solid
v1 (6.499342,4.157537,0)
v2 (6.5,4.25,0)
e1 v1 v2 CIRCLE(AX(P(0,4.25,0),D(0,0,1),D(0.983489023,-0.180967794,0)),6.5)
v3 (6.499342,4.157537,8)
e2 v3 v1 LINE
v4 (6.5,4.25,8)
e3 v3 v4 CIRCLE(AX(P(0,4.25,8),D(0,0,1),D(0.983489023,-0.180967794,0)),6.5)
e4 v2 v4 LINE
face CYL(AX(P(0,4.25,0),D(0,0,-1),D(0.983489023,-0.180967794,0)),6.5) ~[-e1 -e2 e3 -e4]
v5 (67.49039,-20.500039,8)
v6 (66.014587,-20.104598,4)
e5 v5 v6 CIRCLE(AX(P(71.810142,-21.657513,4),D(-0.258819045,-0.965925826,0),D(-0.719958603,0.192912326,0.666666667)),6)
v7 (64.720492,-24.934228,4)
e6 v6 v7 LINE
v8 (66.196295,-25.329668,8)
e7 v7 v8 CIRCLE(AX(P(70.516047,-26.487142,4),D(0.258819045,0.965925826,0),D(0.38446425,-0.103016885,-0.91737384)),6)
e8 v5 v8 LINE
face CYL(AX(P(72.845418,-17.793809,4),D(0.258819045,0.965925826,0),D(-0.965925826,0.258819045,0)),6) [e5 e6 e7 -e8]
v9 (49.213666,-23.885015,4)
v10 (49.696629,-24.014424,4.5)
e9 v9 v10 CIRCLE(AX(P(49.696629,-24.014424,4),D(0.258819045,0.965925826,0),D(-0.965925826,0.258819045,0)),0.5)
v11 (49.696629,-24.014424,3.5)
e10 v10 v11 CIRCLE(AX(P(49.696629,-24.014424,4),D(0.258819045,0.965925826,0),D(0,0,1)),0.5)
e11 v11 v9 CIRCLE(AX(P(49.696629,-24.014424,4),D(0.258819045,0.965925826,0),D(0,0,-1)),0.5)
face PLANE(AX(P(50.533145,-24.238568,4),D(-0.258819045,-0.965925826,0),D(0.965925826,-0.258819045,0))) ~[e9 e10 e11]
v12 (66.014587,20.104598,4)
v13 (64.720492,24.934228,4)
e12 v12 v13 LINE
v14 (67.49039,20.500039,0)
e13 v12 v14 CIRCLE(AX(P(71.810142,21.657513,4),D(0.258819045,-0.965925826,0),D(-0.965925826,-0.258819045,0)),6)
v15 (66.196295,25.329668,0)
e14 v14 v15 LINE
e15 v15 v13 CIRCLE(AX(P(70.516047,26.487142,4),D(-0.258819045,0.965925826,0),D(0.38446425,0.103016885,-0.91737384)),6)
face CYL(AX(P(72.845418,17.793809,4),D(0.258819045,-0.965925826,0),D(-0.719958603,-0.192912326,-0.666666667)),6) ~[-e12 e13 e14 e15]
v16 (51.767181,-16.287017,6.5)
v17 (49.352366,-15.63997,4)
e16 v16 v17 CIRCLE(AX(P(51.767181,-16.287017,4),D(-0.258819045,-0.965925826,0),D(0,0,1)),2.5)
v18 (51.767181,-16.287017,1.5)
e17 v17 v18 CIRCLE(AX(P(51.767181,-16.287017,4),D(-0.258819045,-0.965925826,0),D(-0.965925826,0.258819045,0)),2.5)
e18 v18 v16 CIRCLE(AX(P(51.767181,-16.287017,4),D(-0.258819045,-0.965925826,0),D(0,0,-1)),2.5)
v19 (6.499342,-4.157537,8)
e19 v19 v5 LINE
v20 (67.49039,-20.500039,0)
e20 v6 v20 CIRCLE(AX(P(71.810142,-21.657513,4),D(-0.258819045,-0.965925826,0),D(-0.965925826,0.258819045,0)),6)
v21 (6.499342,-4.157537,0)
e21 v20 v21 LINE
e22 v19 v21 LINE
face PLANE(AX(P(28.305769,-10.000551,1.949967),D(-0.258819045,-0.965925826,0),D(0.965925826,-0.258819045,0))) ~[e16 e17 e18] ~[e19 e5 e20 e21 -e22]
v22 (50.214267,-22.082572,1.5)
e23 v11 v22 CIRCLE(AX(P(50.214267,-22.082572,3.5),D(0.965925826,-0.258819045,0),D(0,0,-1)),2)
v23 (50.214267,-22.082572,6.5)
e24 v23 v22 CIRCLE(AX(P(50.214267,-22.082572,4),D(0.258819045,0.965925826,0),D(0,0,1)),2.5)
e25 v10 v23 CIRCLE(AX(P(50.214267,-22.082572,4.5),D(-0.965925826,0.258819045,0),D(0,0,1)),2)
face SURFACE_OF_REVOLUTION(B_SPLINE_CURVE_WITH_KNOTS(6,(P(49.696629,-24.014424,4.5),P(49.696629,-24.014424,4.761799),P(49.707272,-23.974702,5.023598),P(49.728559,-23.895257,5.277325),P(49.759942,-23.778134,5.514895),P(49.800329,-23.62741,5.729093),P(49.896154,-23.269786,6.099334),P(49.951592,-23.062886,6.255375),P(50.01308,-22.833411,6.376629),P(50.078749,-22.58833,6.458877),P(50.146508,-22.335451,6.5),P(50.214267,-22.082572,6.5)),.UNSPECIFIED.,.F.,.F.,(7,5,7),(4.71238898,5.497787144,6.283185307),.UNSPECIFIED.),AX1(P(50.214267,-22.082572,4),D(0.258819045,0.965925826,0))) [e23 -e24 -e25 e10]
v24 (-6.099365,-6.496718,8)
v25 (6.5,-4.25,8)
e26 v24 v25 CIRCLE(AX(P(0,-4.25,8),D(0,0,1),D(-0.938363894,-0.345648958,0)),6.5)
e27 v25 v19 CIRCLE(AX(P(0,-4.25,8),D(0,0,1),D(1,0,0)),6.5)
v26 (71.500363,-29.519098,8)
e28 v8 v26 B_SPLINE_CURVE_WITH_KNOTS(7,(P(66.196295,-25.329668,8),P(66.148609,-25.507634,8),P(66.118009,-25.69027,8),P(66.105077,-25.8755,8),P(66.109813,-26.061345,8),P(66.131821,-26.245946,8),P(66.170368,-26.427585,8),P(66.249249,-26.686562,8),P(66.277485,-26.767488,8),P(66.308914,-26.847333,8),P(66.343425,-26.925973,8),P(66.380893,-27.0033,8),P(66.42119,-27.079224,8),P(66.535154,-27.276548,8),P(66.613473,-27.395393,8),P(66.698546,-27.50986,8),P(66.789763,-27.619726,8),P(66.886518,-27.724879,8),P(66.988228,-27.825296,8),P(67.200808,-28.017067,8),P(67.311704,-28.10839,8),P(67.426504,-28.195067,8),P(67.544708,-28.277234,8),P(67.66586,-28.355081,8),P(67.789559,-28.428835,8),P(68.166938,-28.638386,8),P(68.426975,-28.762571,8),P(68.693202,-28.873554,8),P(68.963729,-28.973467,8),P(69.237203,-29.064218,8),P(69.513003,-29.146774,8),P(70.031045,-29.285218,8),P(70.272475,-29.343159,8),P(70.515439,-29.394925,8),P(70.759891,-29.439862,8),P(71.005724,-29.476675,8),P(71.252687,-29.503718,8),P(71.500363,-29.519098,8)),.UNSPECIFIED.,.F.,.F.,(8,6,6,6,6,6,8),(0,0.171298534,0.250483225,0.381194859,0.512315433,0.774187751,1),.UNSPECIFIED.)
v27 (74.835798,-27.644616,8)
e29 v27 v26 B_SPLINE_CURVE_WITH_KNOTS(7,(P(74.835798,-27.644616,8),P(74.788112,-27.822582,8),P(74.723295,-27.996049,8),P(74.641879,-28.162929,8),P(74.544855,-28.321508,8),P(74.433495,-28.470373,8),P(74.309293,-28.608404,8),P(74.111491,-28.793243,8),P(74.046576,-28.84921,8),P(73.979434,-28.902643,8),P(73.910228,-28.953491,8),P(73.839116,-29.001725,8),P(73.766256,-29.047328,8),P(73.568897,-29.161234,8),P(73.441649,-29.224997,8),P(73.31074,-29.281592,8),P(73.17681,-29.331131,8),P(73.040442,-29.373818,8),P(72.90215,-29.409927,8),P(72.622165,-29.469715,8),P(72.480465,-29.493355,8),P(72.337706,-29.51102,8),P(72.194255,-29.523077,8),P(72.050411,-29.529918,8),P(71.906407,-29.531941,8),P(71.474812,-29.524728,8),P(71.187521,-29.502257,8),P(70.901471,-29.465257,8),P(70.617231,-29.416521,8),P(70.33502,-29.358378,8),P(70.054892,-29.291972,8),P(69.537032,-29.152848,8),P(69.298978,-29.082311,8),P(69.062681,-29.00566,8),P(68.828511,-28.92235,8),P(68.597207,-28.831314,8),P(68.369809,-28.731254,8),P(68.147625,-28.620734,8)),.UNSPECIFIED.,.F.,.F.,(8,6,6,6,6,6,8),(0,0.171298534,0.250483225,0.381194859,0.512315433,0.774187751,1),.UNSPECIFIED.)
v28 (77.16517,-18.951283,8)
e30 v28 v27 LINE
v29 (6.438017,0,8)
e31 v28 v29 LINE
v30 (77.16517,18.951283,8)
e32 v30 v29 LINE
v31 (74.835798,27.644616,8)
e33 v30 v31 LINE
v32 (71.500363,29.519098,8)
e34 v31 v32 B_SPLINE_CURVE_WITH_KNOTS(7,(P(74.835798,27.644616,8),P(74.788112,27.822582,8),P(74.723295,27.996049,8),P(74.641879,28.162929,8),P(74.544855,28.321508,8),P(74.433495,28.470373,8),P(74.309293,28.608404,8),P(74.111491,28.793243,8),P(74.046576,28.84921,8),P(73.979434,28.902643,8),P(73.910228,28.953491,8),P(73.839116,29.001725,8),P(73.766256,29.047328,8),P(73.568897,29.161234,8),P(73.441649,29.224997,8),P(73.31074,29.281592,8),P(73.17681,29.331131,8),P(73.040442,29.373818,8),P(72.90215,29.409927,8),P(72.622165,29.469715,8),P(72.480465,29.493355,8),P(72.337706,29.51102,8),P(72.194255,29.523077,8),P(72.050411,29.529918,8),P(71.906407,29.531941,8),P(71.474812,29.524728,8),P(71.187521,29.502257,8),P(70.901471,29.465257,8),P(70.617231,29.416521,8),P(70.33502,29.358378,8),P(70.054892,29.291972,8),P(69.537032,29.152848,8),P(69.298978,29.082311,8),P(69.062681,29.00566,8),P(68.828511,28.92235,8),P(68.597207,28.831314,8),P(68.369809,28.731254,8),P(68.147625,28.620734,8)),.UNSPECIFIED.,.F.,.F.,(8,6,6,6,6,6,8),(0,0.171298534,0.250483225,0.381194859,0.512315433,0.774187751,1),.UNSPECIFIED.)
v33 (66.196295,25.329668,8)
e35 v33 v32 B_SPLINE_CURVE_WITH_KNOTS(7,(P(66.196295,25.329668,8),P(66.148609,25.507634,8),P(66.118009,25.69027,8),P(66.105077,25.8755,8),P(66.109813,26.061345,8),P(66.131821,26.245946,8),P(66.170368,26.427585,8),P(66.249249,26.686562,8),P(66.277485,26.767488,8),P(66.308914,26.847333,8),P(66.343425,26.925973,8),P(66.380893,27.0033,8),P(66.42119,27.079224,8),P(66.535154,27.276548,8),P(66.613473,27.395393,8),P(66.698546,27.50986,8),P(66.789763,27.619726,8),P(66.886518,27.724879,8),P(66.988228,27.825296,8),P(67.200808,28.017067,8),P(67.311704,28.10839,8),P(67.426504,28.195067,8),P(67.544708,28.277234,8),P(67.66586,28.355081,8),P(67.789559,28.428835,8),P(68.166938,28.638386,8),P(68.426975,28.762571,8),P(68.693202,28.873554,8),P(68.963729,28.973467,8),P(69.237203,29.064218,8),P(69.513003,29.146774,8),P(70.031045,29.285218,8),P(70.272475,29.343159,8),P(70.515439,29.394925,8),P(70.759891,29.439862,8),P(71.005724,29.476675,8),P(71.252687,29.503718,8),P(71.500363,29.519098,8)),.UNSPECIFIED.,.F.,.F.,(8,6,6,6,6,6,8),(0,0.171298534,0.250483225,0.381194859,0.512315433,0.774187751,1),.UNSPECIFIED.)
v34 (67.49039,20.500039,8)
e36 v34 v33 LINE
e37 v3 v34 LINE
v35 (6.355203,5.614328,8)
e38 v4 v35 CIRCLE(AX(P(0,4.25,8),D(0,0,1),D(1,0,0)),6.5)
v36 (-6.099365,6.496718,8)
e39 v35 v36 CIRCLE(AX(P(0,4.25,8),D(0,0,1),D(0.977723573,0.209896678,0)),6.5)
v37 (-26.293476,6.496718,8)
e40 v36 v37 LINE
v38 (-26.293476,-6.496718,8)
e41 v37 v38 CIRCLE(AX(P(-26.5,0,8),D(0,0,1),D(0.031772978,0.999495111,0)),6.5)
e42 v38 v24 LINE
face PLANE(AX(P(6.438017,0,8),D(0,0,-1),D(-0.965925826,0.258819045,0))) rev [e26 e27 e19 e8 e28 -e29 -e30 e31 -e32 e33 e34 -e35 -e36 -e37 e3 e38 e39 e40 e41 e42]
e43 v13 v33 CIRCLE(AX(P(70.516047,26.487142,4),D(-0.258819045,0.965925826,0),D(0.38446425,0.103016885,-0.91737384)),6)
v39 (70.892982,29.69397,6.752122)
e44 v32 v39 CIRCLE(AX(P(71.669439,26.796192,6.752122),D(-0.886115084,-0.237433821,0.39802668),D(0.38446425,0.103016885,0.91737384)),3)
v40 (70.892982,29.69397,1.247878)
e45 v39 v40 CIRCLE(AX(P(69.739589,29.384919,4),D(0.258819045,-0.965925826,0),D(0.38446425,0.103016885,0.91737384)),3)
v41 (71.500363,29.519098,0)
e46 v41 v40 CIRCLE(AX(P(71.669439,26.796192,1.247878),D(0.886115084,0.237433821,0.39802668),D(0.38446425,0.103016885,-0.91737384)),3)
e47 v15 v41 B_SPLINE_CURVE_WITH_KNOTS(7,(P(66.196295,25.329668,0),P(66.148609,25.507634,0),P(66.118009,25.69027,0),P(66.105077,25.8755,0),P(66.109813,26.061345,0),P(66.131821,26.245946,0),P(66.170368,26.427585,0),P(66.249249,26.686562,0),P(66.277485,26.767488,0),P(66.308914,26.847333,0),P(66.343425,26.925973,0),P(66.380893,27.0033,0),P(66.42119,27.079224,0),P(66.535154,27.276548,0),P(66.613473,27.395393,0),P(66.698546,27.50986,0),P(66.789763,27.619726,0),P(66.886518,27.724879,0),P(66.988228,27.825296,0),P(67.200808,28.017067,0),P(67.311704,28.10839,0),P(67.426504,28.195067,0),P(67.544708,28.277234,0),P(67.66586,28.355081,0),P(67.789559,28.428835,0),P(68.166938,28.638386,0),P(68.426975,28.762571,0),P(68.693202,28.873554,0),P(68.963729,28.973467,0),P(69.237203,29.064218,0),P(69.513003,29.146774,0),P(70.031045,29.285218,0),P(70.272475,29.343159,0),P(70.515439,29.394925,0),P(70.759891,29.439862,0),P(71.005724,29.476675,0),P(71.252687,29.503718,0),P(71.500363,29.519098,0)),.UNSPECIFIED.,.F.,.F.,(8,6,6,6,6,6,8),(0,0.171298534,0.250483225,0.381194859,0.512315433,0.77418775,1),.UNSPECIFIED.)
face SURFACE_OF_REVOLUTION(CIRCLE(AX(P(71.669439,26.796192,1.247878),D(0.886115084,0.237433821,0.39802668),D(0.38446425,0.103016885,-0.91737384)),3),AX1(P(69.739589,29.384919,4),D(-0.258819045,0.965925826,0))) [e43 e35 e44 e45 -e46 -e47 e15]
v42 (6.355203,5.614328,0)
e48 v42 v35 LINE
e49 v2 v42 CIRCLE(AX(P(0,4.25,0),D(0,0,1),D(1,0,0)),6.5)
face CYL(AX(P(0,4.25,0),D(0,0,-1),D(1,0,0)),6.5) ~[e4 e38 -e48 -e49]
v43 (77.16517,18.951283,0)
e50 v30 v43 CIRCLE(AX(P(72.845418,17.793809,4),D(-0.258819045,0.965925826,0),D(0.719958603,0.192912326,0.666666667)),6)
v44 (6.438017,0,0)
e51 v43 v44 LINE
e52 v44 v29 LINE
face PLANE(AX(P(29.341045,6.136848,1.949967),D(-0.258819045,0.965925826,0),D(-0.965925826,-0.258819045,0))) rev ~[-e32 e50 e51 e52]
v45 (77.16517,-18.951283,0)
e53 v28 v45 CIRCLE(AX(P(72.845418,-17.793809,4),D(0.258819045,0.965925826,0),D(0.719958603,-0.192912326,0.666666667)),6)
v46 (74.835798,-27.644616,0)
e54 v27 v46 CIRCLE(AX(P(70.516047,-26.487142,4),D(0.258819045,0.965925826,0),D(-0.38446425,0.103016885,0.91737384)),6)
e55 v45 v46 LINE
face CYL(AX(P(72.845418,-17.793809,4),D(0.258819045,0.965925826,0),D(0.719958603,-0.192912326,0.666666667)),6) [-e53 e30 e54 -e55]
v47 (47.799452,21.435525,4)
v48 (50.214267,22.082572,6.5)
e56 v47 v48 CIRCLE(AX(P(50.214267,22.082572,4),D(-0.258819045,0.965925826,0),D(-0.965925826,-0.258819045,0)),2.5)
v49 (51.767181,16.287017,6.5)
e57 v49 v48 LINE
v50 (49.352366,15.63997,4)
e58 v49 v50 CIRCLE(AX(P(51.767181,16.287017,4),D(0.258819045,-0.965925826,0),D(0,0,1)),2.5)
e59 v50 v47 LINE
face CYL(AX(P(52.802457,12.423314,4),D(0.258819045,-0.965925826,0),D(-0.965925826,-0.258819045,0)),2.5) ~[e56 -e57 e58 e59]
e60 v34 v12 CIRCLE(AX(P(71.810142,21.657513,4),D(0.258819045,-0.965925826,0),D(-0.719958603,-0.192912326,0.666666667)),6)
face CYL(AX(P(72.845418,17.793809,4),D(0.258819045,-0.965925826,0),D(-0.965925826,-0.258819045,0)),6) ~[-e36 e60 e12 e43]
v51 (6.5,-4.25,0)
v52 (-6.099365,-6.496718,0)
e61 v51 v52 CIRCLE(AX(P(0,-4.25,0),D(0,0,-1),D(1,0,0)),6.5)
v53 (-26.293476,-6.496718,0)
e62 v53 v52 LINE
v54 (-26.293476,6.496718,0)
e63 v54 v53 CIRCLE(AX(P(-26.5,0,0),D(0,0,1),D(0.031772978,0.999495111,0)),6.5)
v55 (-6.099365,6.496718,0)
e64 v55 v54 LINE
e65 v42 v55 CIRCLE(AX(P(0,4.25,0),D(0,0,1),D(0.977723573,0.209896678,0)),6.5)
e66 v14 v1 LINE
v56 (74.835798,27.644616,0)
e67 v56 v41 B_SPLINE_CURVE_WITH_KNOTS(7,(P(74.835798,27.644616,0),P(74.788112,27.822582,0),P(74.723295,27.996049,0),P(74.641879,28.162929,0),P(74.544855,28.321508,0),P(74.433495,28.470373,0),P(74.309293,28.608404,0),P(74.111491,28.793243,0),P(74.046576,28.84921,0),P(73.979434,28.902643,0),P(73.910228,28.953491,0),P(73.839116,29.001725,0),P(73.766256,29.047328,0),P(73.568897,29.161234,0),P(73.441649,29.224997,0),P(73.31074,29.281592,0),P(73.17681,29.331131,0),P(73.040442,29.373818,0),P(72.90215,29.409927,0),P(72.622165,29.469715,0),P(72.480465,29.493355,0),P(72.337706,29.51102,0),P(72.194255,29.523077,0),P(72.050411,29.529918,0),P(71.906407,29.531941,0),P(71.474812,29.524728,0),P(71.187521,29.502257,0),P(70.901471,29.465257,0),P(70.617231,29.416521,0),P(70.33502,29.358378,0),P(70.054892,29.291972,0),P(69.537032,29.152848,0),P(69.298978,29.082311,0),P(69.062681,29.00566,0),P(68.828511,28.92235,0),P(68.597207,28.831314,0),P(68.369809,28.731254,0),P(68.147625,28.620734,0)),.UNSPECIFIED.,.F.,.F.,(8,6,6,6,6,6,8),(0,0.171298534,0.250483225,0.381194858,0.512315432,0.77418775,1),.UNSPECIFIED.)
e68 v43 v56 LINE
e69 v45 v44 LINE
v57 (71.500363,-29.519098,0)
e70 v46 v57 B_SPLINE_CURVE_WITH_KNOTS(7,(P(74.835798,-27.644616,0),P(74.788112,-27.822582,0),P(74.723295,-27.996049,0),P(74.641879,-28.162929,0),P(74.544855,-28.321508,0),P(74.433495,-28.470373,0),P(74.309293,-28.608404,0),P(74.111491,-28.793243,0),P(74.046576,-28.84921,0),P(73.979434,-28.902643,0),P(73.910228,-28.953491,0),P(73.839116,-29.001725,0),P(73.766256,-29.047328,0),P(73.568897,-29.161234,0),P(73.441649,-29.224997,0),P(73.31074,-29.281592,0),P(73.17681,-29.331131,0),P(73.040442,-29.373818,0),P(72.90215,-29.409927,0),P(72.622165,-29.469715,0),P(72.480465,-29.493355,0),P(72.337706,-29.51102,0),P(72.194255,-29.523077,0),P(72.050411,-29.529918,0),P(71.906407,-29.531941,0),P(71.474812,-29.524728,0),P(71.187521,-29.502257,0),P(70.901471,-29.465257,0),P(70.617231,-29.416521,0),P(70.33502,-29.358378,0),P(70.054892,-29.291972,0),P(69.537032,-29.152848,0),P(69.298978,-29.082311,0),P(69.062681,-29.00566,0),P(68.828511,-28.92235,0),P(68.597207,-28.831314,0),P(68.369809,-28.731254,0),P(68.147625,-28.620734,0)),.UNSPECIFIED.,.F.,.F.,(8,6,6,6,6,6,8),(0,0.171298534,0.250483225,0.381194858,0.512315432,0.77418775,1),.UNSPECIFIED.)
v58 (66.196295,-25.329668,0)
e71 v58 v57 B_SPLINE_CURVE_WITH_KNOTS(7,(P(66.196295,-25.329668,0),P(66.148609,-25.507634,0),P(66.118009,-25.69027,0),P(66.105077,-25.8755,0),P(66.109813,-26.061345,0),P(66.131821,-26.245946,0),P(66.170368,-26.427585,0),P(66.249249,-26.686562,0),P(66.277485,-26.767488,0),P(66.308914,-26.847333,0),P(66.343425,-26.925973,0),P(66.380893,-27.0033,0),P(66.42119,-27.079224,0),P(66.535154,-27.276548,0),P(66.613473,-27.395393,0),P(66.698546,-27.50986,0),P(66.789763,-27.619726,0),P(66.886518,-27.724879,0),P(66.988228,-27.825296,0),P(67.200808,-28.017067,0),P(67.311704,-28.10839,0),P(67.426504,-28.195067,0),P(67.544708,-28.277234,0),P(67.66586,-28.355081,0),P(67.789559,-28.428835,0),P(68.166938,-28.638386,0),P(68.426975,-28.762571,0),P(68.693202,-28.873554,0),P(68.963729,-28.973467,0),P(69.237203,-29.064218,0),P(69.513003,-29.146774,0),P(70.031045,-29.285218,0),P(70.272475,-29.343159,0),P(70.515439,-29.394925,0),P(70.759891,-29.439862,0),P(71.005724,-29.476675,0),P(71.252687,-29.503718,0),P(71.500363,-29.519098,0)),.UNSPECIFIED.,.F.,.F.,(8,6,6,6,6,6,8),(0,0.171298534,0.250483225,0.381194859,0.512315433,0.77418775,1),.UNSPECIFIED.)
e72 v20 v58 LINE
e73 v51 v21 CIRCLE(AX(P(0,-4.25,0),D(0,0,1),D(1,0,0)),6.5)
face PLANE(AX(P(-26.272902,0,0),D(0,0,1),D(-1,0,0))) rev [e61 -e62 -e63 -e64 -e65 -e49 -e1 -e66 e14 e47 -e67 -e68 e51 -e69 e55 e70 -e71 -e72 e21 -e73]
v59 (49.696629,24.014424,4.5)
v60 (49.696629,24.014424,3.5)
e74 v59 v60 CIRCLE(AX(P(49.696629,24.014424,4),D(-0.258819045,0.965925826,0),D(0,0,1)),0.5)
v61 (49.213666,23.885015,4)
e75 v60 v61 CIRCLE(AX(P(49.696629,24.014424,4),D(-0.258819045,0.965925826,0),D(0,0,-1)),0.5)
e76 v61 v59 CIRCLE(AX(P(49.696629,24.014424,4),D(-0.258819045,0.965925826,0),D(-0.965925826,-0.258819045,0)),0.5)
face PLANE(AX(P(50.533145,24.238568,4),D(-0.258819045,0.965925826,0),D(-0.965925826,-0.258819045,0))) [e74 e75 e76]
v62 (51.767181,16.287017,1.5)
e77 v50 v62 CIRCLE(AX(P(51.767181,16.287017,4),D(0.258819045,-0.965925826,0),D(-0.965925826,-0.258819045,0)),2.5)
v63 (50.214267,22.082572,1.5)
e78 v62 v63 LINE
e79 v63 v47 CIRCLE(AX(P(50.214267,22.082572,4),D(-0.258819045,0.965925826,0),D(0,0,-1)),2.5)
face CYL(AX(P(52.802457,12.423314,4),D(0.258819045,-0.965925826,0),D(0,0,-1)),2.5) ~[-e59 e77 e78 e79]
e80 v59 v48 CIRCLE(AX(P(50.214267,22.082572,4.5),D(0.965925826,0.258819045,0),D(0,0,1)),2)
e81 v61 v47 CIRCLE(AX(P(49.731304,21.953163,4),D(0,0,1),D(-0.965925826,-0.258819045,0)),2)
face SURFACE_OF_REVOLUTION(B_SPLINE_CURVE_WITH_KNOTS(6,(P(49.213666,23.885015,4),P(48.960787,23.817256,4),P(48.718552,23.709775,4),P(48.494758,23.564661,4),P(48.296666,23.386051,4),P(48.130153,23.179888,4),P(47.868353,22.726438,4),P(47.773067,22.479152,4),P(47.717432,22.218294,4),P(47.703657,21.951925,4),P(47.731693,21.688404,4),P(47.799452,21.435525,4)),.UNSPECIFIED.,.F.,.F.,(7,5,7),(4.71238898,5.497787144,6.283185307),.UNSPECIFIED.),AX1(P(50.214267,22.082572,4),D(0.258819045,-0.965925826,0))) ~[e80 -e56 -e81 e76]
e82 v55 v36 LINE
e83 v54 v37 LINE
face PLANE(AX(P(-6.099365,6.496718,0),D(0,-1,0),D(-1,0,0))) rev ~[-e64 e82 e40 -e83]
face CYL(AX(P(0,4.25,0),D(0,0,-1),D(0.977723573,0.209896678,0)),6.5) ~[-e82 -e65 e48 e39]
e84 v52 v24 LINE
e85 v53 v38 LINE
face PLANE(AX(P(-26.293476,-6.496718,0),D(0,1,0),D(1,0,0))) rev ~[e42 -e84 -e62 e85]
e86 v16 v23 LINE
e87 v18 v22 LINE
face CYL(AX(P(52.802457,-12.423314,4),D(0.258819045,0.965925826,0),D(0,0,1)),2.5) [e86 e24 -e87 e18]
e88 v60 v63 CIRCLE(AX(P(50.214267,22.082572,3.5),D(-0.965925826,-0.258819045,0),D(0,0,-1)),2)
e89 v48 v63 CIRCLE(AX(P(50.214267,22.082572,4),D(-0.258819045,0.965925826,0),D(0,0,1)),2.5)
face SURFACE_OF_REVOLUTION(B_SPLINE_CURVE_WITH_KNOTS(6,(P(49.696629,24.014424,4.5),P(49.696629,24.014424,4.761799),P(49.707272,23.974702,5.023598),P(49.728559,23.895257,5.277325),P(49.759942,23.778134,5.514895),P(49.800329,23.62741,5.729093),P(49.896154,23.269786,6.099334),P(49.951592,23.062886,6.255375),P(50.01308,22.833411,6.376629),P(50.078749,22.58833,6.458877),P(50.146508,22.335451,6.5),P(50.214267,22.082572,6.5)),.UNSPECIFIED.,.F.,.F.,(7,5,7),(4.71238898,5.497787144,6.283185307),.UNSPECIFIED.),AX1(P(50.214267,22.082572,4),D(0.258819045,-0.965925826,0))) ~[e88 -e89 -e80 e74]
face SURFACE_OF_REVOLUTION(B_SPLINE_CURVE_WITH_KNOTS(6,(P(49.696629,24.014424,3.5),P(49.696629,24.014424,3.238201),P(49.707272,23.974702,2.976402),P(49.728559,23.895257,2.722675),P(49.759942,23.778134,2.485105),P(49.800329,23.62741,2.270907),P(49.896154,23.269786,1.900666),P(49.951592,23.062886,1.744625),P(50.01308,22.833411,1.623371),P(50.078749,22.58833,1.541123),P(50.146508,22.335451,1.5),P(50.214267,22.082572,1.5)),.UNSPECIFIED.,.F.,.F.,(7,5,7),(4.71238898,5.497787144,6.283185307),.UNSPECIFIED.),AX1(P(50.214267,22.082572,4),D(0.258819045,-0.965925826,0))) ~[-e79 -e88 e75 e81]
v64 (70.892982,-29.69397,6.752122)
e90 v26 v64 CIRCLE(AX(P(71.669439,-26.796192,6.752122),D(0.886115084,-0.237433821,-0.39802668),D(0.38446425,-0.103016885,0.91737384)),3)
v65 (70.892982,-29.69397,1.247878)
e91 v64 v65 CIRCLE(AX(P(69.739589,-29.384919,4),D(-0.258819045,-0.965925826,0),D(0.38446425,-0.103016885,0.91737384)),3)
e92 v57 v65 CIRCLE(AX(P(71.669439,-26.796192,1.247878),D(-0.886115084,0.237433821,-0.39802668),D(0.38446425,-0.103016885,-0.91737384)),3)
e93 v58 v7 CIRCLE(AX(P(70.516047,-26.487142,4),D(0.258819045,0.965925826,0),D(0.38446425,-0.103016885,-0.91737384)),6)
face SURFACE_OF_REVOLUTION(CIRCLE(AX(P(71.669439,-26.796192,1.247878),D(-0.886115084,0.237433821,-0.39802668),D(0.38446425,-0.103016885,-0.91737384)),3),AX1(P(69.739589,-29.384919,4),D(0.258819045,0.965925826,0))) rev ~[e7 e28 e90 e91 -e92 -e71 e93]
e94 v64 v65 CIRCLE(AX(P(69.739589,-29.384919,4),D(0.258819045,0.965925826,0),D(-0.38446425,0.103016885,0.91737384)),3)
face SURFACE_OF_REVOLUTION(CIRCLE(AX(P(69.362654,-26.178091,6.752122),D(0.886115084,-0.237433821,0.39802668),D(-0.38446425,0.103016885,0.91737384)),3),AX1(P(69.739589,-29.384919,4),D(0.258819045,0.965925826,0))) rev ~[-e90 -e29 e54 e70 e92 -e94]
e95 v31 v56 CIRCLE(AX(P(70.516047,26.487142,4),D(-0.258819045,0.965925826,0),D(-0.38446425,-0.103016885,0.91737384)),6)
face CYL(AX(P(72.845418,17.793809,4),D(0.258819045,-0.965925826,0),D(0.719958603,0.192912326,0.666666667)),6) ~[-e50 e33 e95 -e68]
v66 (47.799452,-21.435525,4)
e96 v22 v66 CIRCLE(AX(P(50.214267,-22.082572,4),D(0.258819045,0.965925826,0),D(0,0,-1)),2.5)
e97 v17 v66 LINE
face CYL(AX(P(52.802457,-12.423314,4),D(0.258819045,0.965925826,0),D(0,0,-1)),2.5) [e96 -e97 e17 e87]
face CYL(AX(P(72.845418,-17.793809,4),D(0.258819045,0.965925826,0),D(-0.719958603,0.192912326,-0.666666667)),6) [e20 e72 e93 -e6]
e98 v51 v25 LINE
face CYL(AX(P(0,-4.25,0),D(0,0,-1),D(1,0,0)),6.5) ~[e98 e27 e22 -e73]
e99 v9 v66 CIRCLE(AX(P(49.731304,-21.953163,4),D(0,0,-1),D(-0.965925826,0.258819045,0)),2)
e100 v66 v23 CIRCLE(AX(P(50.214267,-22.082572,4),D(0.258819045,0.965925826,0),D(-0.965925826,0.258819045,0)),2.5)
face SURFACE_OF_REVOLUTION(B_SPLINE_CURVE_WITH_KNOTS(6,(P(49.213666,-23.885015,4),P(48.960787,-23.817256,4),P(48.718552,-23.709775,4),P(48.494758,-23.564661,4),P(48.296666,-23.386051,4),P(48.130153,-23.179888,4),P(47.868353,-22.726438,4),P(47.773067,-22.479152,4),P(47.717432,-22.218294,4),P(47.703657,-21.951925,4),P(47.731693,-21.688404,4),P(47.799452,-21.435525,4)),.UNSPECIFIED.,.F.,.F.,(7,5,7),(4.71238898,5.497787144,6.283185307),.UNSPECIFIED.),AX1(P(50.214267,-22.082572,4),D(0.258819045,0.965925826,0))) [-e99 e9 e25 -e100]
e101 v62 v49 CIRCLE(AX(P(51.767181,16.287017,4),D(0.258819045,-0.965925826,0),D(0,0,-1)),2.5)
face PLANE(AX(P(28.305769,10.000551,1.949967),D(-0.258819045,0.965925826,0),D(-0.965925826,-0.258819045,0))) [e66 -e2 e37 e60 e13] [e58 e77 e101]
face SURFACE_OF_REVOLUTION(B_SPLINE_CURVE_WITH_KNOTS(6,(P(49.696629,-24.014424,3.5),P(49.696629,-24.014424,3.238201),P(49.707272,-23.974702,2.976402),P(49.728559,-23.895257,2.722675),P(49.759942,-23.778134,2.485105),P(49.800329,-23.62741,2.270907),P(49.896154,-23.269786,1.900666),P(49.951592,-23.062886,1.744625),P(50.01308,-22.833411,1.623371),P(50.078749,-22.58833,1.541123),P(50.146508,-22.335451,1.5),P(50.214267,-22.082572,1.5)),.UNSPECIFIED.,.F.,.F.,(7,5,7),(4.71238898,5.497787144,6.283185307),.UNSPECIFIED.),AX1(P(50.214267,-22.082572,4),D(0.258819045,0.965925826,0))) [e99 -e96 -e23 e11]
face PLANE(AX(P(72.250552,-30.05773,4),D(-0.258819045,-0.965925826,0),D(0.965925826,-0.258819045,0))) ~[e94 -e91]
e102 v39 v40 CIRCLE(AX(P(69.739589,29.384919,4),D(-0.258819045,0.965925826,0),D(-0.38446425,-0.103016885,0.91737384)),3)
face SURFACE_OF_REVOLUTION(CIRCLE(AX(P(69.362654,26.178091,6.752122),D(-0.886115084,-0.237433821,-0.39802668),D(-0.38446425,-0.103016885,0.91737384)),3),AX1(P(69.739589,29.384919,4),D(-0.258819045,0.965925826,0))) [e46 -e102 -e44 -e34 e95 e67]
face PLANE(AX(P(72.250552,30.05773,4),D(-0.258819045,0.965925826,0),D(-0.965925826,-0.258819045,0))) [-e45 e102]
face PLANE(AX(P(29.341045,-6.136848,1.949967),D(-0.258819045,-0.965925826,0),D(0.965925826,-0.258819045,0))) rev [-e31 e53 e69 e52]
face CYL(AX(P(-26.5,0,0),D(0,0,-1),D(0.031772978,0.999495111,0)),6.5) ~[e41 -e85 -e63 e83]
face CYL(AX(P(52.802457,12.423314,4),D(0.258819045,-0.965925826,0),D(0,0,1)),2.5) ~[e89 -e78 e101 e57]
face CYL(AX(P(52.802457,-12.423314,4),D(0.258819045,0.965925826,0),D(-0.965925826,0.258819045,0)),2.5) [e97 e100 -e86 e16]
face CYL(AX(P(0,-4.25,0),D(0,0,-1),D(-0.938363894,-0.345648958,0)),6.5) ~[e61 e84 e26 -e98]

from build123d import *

# Parameters (mm, degrees)
F1_DEPTH    = 8
F4_DEPTH    = 12
F5_DEPTH    = 12
F6_DEPTH    = 4
F7_T2_ANGLE = 226.9097490639
F7_T4_ANGLE = 226.9097490639
F8_R        = 2


# Not quite as in the source:
# - a fillet or chamfer that OpenCascade refuses, or shapes differently, is made with other operations: its cross-section is extruded or revolved along the edge and cut away or added
# - a feature names something its author has since deleted; it is built from what else it names


with BuildPart() as f1:
    # F0 (on Top) → F1 (new body)
    with BuildSketch(Plane.XY):
        with BuildLine():
            ThreePointArc((-26.2934756426, -6.4967182246), (-21.8313594954, -4.5225872947), (-20, 0))
            ThreePointArc((-20, 0), (-21.8313594954, 4.5225872947), (-26.2934756426, 6.4967182246))
            ThreePointArc((-26.2934756426, 6.4967182246), (-33, 0), (-26.2934756426, -6.4967182246))
        make_face()
        with BuildLine():
            ThreePointArc((4.9180788932, 0), (0, 2.25), (-4.9180788932, 0))
            ThreePointArc((-4.9180788932, 0), (0, -2.25), (4.9180788932, 0))
        make_face()
        with BuildLine():
            Line((6.4380174247, 0), (6.3926786471, 3.0737093407))
            ThreePointArc((6.3926786471, 3.0737093407), (5.8604804677, 1.4384579519), (4.9180788932, 0))
            ThreePointArc((4.9180788932, 0), (6.0748085227, -1.9377064606), (6.4992929884, -4.1541321195))
            Line((6.4992929884, -4.1541321195), (6.4380174247, 0))
        make_face()
        with BuildLine():
            ThreePointArc((-26.2934756426, 6.4967182246), (-21.8313594954, 4.5225872947), (-20, 0))
            ThreePointArc((-20, 0), (-21.8313594954, -4.5225872947), (-26.2934756426, -6.4967182246))
            Line((-26.2934756426, -6.4967182246), (-6.0993653128, -6.4967182246))
            ThreePointArc((-6.0993653128, -6.4967182246), (-6.3951431673, -3.0871827877), (-4.9180788932, 0))
            ThreePointArc((-4.9180788932, 0), (-6.3951431673, 3.0871827877), (-6.0993653128, 6.4967182246))
            Line((-6.0993653128, 6.4967182246), (-26.2934756426, 6.4967182246))
        make_face()
        with BuildLine():
            ThreePointArc((-4.9180788932, 0), (-6.3951431673, -3.0871827877), (-6.0993653128, -6.4967182246))
            ThreePointArc((-6.0993653128, -6.4967182246), (1.141079635, -10.6490575296), (6.5, -4.25))
            ThreePointArc((6.5, -4.25), (6.4998232447, -4.2020647563), (6.4992929884, -4.1541321195))
            ThreePointArc((6.4992929884, -4.1541321195), (6.0748085227, -1.9377064606), (4.9180788932, 0))
            ThreePointArc((4.9180788932, 0), (0, -2.25), (-4.9180788932, 0))
        make_face()
        with BuildLine():
            ThreePointArc((6.3552032224, 5.614328407), (0.4593650036, 10.7337476658), (-6.0993653128, 6.4967182246))
            ThreePointArc((-6.0993653128, 6.4967182246), (-6.3951431673, 3.0871827877), (-4.9180788932, 0))
            ThreePointArc((-4.9180788932, 0), (0, 2.25), (4.9180788932, 0))
            ThreePointArc((4.9180788932, 0), (5.8604804677, 1.4384579519), (6.3926786471, 3.0737093407))
            Line((6.3926786471, 3.0737093407), (6.3552032224, 5.614328407))
        make_face()
        with BuildLine():
            ThreePointArc((6.5, 4.25), (6.4636994417, 4.9359952822), (6.3552032224, 5.614328407))
            Line((6.3552032224, 5.614328407), (6.3926786471, 3.0737093407))
            ThreePointArc((6.3926786471, 3.0737093407), (6.4731140576, 3.6594118212), (6.5, 4.25))
        make_face()
    extrude(amount=F1_DEPTH)



with BuildPart() as f4:
    # F3 (on line) → F4 (new body)
    with BuildSketch(Plane(origin=(0.4312653925, -1.6095043562, 0), x_dir=(-0.9659258263, -0.2588190451, 0), z_dir=(-0.2588190451, 0.9659258263, 0))):
        with BuildLine():
            Line((-79.4407832557, 0), (-74.9686473007, 0))
            Line((-74.9686473007, 0), (-74.9686473007, 8))
            Line((-74.9686473007, 8), (-79.4407832557, 8))
            ThreePointArc((-79.4407832557, 8), (-80.9686473007, 4), (-79.4407832557, 0))
        make_face()
        with BuildLine():
            Line((-74.9686473007, 8), (-74.9686473007, 0))
            Line((-74.9686473007, 0), (-70.4965113457, 0))
            ThreePointArc((-70.4965113457, 0), (-69.3636131469, 1.8590674614), (-68.9686473007, 4))
            ThreePointArc((-68.9686473007, 4), (-69.3636131469, 6.1409325386), (-70.4965113457, 8))
            Line((-70.4965113457, 8), (-74.9686473007, 8))
        make_face()
    extrude(amount=F4_DEPTH)


with BuildPart() as f5:
    # F3 (on line) → F5 (new body)
    with BuildSketch(Plane(origin=(0.4312653925, -1.6095043562, 0), x_dir=(-0.9659258263, -0.2588190451, 0), z_dir=(-0.2588190451, 0.9659258263, 0))):
        with BuildLine():
            ThreePointArc((-54.2186473007, 6.5), (-56.7186473007, 4), (-54.2186473007, 1.5))
            Line((-54.2186473007, 1.5), (-54.2186473007, 4))
            Line((-54.2186473007, 4), (-54.2186473007, 6.5))
        make_face()
        with BuildLine():
            ThreePointArc((-51.7186473007, 4), (-52.4508803477, 5.767766953), (-54.2186473007, 6.5))
            Line((-54.2186473007, 6.5), (-54.2186473007, 4))
            Line((-54.2186473007, 4), (-51.7186473007, 4))
        make_face()
        with BuildLine():
            Line((-54.2186473007, 4), (-54.2186473007, 1.5))
            ThreePointArc((-54.2186473007, 1.5), (-52.4508803477, 2.232233047), (-51.7186473007, 4))
            Line((-51.7186473007, 4), (-54.2186473007, 4))
        make_face()
    extrude(amount=F5_DEPTH)


with BuildPart() as f1_1:
    add(f1.part)

    add(f4.part)  # F6 merges F4

    add(f5.part)  # F6 merges F5
    # F3 (on line) → F6 (join)
    with BuildSketch(Plane(origin=(0.4312653925, -1.6095043562, 0), x_dir=(-0.9659258263, -0.2588190451, 0), z_dir=(-0.2588190451, 0.9659258263, 0))):
        with BuildLine():
            Line((-54.2186473007, 1.5), (-54.2186473007, 0))
            Line((-54.2186473007, 0), (-6.2186473007, 0))
            Line((-6.2186473007, 0), (-6.2186473007, 4))
            Line((-6.2186473007, 4), (-51.7186473007, 4))
            ThreePointArc((-51.7186473007, 4), (-52.4508803477, 2.232233047), (-54.2186473007, 1.5))
        make_face()
        with BuildLine():
            Line((-6.2186473007, 8), (-54.2186473007, 8))
            Line((-54.2186473007, 8), (-54.2186473007, 6.5))
            ThreePointArc((-54.2186473007, 6.5), (-52.4508803477, 5.767766953), (-51.7186473007, 4))
            Line((-51.7186473007, 4), (-6.2186473007, 4))
            Line((-6.2186473007, 4), (-6.2186473007, 8))
        make_face()
        with BuildLine():
            ThreePointArc((-68.9686473007, 4), (-69.3636131469, 1.8590674614), (-70.4965113457, 0))
            Line((-70.4965113457, 0), (-54.2186473007, 0))
            Line((-54.2186473007, 0), (-54.2186473007, 1.5))
            ThreePointArc((-54.2186473007, 1.5), (-56.7186473007, 4), (-54.2186473007, 6.5))
            Line((-54.2186473007, 6.5), (-54.2186473007, 8))
            Line((-54.2186473007, 8), (-70.4965113457, 8))
            ThreePointArc((-70.4965113457, 8), (-69.3636131469, 6.1409325386), (-68.9686473007, 4))
        make_face()
    extrude(amount=F6_DEPTH)

    # F7: fillet of radius 3 on 2 edges, made by hand

    # F7_s1 → F7_t2 (revolve, cut)
    with BuildSketch(Plane(origin=(62.3527130216, 16.7073591, 28.0076976241), x_dir=(-0.2588190451, 0.9659258263, 0), z_dir=(0.8861150843, 0.2374338212, 0.3980266798))):
        with BuildLine():
            ThreePointArc((7.3337184778, -32.1700264164), (9.4550388213, -31.2913467599), (10.3337184778, -29.1700264164))
            Line((10.3337184778, -29.1700264164), (10.3337184778, -32.1700264164))
            Line((10.3337184778, -32.1700264164), (7.3337184778, -32.1700264164))
        make_face()
    revolve(axis=Axis((69.7395894409, 29.3849192663, 4), (-0.2588190451, 0.9659258263, 0)), revolution_arc=F7_T2_ANGLE, mode=Mode.SUBTRACT)

    # F7_s3 → F7_t4 (revolve, cut)
    with BuildSketch(Plane(origin=(62.3527130216, 16.7073591, 28.0076976241), x_dir=(0.2588190451, -0.9659258263, 0), z_dir=(-0.8861150843, -0.2374338212, -0.3980266798))):
        with BuildLine():
            ThreePointArc((-7.3337184778, -20.1700264164), (-9.4550388213, -21.0487060728), (-10.3337184778, -23.1700264164))
            Line((-10.3337184778, -23.1700264164), (-10.3337184778, -20.1700264164))
            Line((-10.3337184778, -20.1700264164), (-7.3337184778, -20.1700264164))
        make_face()
    revolve(axis=Axis((69.7395894409, 29.3849192663, 4), (-0.2588190451, 0.9659258263, 0)), revolution_arc=F7_T4_ANGLE, mode=Mode.SUBTRACT)

    # F8
    f8_edges = [f1_1.edges().sort_by_distance(p)[0] for p in [
        (49.696629, 24.014424, 6.5),
    ]]
    fillet(f8_edges, radius=F8_R)

    # F9: F1 across plane


with BuildPart() as f1_2:
    add(f1_1.part)
    add(f1_1.part.mirror(Plane.XZ))


solid = f1_2.part
